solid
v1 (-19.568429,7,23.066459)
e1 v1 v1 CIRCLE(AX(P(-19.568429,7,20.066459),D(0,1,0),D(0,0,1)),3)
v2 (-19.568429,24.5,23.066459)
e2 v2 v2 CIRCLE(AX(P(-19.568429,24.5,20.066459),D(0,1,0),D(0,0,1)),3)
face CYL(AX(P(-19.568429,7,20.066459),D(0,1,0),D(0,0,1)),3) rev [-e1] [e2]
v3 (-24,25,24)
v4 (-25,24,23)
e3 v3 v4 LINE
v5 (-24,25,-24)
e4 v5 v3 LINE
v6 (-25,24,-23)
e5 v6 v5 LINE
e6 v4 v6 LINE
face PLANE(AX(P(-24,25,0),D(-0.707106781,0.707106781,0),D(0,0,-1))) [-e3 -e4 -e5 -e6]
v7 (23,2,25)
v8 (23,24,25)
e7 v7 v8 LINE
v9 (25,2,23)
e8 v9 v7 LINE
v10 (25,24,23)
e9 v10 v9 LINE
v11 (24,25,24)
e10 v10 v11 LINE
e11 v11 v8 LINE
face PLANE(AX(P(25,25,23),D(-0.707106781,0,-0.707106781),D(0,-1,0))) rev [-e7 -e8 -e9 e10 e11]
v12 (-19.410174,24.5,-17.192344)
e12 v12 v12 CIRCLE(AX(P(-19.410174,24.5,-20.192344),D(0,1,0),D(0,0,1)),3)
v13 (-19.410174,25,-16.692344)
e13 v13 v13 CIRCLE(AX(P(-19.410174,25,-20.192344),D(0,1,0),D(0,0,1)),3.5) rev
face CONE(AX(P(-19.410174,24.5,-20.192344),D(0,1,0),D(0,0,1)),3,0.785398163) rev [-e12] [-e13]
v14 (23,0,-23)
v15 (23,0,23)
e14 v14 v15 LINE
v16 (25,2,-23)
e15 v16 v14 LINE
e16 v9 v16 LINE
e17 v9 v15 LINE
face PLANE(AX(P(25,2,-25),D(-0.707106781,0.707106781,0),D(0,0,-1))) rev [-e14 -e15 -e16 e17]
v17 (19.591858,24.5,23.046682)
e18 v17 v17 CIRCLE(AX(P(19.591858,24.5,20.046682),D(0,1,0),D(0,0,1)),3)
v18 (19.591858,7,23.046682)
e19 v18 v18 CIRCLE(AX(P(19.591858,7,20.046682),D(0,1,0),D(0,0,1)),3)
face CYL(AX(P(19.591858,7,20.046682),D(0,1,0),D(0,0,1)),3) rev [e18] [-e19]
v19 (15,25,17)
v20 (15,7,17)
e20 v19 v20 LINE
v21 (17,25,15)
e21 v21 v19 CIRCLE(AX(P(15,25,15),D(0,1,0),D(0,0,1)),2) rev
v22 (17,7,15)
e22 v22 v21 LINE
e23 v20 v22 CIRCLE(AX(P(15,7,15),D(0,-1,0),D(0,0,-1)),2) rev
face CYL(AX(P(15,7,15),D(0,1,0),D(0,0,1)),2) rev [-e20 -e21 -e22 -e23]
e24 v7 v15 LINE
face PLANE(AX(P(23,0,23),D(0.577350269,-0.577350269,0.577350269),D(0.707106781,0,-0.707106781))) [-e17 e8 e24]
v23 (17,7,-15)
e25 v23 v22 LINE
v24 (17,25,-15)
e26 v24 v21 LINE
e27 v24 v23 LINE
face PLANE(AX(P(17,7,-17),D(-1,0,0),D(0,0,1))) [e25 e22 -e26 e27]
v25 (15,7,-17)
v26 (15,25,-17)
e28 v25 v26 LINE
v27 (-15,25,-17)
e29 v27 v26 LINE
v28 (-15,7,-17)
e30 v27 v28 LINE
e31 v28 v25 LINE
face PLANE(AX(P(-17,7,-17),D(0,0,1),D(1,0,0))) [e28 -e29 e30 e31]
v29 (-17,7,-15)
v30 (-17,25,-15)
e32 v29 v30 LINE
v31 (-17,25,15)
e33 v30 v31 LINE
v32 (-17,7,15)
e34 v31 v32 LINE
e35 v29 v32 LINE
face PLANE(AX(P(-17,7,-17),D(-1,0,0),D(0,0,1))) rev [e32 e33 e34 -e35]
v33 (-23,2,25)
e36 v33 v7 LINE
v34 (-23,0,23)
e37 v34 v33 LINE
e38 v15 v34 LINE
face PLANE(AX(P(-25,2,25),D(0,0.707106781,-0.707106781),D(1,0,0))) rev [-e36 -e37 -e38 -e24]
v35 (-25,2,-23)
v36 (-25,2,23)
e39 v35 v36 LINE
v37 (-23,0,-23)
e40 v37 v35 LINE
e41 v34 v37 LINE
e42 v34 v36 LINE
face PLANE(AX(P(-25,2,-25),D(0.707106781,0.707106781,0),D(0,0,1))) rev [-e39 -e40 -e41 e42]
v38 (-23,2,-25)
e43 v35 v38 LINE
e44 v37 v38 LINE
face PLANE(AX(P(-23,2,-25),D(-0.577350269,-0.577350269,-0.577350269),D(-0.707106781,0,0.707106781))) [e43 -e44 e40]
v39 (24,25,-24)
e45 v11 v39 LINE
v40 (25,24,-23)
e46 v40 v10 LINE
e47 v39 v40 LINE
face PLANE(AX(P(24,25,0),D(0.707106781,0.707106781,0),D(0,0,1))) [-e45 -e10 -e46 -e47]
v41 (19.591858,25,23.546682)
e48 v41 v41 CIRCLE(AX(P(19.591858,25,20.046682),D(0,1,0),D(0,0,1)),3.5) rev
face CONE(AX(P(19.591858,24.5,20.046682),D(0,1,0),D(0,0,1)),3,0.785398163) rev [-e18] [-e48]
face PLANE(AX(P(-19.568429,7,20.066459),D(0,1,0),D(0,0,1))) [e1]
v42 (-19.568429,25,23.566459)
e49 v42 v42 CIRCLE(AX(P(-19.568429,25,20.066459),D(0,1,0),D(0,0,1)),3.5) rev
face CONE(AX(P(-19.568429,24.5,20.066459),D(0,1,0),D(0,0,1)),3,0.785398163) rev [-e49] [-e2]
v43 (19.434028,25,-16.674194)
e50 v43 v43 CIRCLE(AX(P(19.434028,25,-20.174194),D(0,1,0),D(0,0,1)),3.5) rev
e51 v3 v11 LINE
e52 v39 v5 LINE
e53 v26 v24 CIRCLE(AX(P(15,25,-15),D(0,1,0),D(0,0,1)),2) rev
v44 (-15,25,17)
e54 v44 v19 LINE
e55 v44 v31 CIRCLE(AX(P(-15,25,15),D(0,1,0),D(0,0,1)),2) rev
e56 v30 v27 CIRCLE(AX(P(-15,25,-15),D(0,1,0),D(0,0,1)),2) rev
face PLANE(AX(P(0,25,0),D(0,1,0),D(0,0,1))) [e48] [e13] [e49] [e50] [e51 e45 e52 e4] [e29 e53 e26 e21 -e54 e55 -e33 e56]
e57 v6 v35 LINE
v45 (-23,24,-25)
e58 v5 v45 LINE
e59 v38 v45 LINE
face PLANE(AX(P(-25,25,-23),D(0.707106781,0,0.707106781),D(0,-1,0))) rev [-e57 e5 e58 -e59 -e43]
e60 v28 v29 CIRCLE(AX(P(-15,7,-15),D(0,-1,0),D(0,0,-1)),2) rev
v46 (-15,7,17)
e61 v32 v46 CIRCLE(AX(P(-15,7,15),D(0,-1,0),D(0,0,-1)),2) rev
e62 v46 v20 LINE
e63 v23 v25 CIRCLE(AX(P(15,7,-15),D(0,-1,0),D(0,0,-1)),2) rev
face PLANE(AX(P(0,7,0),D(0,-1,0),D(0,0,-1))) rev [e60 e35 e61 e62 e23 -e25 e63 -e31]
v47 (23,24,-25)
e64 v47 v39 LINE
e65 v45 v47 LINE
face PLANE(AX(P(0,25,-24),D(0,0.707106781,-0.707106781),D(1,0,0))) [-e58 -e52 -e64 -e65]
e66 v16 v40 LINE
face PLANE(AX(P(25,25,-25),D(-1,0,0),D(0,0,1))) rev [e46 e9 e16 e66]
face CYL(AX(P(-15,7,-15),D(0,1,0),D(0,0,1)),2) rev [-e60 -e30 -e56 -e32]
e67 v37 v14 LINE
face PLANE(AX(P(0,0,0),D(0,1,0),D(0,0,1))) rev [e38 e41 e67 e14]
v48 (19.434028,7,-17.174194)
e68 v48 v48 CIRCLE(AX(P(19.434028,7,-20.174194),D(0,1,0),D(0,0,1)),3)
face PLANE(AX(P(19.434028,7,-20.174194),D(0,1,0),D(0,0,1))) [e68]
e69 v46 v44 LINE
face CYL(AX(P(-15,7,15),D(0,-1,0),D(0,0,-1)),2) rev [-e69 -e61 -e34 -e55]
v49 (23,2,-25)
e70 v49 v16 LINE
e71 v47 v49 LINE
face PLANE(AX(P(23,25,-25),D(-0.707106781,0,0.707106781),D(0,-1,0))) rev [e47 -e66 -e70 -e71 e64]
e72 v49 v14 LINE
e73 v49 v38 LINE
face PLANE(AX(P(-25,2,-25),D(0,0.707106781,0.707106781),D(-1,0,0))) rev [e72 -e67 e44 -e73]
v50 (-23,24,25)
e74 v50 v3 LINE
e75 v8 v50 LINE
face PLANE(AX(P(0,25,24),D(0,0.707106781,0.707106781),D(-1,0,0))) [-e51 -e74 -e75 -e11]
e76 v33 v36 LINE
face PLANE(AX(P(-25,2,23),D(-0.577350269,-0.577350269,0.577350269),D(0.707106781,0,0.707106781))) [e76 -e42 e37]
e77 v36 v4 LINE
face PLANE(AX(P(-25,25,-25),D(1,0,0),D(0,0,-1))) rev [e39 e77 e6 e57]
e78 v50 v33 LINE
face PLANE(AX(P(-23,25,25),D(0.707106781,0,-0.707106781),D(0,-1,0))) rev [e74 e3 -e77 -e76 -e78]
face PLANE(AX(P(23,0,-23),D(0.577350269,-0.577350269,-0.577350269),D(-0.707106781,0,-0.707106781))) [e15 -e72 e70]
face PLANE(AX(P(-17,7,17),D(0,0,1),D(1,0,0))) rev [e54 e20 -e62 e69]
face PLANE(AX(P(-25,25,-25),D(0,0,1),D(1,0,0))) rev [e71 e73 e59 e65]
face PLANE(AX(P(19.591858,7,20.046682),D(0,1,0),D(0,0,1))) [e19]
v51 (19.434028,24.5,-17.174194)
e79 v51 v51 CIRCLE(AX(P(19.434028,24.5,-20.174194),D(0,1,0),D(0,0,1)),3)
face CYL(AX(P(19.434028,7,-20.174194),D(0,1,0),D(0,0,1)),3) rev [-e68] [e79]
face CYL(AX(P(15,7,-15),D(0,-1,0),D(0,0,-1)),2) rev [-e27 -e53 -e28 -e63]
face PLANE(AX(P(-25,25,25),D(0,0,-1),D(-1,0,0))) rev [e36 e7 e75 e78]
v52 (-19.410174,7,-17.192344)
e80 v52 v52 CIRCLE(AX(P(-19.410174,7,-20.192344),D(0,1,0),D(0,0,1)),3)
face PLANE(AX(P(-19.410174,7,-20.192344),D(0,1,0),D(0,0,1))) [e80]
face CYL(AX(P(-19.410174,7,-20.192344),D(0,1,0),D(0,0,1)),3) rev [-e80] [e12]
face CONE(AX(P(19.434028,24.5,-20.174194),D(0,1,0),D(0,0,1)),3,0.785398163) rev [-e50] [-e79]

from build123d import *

# Parameters (mm, degrees)
SKETCH1_W           = 50
SKETCH1_H           = 50
BOSS_EXTRUDE1_DEPTH = 25
SKETCH2_R           = 3
SKETCH2_W           = 34
SKETCH2_H           = 34
CUT_EXTRUDE1_DEPTH  = 18
CHAMFER1_SIZE       = 2
CHAMFER2_SIZE       = 1
FILLET1_R           = 2
CHAMFER3_SIZE       = 0.5


with BuildPart() as part:
    # Sketch1 → Boss-Extrude1 (new body)
    with BuildSketch(Plane(origin=(0, 0, 0), x_dir=(1, 0, 0), z_dir=(0, 1, 0))):
        Rectangle(SKETCH1_W, SKETCH1_H)
    extrude(amount=BOSS_EXTRUDE1_DEPTH)

    # Sketch2 → Cut-Extrude1 (cut)
    with BuildSketch(Plane(origin=(0, 25, 0), x_dir=(1, 0, 0), z_dir=(0, 1, 0))):
        with Locations(Location((-19.568429399, -20.066458938, 0), (0, 0, 270))):
            Circle(SKETCH2_R)
        with Locations(Location((-19.410173636, 20.192344443, 0), (0, 0, 270))):
            Circle(SKETCH2_R)
        with Locations(Location((19.591857754, -20.046682357, 0), (0, 0, 270))):
            Circle(SKETCH2_R)
        with Locations(Location((19.434027978, 20.17419404, 0), (0, 0, 270))):
            Circle(SKETCH2_R)
        Rectangle(SKETCH2_W, SKETCH2_H)
    extrude(amount=-CUT_EXTRUDE1_DEPTH, mode=Mode.SUBTRACT)

    # Chamfer1
    chamfer1_edges = [part.edges().sort_by_distance(p)[0] for p in [
        (0, 0, 25),
        (-25, 0, 0),
        (0, 0, -25),
        (25, 0, 0),
        (25, 12.5, 25),
        (-25, 12.5, 25),
        (-25, 12.5, -25),
        (25, 12.5, -25),
    ]]
    chamfer(chamfer1_edges, length=CHAMFER1_SIZE)

    # Chamfer2
    chamfer2_edges = [part.edges().sort_by_distance(p)[0] for p in [
        (-25, 25, 0),
        (0, 25, -25),
        (0, 25, 25),
        (25, 25, 0),
    ]]
    chamfer(chamfer2_edges, length=CHAMFER2_SIZE - 0.0001)  # a hair under: the kernel refuses the full size

    # Fillet1
    fillet1_edges = [part.edges().sort_by_distance(p)[0] for p in [
        (17, 16, 17),
        (-17, 16, 17),
        (-17, 16, -17),
        (17, 16, -17),
    ]]
    fillet(fillet1_edges, radius=FILLET1_R)

    # Chamfer3
    chamfer3_edges = [part.edges().sort_by_distance(p)[0] for p in [
        (19.591857754, 25, 17.046682357),
        (19.434027978, 25, -23.17419404),
        (-19.410173636, 25, -23.192344443),
        (-19.568429399, 25, 17.066458938),
    ]]
    chamfer(chamfer3_edges, length=CHAMFER3_SIZE)


solid = part.part
